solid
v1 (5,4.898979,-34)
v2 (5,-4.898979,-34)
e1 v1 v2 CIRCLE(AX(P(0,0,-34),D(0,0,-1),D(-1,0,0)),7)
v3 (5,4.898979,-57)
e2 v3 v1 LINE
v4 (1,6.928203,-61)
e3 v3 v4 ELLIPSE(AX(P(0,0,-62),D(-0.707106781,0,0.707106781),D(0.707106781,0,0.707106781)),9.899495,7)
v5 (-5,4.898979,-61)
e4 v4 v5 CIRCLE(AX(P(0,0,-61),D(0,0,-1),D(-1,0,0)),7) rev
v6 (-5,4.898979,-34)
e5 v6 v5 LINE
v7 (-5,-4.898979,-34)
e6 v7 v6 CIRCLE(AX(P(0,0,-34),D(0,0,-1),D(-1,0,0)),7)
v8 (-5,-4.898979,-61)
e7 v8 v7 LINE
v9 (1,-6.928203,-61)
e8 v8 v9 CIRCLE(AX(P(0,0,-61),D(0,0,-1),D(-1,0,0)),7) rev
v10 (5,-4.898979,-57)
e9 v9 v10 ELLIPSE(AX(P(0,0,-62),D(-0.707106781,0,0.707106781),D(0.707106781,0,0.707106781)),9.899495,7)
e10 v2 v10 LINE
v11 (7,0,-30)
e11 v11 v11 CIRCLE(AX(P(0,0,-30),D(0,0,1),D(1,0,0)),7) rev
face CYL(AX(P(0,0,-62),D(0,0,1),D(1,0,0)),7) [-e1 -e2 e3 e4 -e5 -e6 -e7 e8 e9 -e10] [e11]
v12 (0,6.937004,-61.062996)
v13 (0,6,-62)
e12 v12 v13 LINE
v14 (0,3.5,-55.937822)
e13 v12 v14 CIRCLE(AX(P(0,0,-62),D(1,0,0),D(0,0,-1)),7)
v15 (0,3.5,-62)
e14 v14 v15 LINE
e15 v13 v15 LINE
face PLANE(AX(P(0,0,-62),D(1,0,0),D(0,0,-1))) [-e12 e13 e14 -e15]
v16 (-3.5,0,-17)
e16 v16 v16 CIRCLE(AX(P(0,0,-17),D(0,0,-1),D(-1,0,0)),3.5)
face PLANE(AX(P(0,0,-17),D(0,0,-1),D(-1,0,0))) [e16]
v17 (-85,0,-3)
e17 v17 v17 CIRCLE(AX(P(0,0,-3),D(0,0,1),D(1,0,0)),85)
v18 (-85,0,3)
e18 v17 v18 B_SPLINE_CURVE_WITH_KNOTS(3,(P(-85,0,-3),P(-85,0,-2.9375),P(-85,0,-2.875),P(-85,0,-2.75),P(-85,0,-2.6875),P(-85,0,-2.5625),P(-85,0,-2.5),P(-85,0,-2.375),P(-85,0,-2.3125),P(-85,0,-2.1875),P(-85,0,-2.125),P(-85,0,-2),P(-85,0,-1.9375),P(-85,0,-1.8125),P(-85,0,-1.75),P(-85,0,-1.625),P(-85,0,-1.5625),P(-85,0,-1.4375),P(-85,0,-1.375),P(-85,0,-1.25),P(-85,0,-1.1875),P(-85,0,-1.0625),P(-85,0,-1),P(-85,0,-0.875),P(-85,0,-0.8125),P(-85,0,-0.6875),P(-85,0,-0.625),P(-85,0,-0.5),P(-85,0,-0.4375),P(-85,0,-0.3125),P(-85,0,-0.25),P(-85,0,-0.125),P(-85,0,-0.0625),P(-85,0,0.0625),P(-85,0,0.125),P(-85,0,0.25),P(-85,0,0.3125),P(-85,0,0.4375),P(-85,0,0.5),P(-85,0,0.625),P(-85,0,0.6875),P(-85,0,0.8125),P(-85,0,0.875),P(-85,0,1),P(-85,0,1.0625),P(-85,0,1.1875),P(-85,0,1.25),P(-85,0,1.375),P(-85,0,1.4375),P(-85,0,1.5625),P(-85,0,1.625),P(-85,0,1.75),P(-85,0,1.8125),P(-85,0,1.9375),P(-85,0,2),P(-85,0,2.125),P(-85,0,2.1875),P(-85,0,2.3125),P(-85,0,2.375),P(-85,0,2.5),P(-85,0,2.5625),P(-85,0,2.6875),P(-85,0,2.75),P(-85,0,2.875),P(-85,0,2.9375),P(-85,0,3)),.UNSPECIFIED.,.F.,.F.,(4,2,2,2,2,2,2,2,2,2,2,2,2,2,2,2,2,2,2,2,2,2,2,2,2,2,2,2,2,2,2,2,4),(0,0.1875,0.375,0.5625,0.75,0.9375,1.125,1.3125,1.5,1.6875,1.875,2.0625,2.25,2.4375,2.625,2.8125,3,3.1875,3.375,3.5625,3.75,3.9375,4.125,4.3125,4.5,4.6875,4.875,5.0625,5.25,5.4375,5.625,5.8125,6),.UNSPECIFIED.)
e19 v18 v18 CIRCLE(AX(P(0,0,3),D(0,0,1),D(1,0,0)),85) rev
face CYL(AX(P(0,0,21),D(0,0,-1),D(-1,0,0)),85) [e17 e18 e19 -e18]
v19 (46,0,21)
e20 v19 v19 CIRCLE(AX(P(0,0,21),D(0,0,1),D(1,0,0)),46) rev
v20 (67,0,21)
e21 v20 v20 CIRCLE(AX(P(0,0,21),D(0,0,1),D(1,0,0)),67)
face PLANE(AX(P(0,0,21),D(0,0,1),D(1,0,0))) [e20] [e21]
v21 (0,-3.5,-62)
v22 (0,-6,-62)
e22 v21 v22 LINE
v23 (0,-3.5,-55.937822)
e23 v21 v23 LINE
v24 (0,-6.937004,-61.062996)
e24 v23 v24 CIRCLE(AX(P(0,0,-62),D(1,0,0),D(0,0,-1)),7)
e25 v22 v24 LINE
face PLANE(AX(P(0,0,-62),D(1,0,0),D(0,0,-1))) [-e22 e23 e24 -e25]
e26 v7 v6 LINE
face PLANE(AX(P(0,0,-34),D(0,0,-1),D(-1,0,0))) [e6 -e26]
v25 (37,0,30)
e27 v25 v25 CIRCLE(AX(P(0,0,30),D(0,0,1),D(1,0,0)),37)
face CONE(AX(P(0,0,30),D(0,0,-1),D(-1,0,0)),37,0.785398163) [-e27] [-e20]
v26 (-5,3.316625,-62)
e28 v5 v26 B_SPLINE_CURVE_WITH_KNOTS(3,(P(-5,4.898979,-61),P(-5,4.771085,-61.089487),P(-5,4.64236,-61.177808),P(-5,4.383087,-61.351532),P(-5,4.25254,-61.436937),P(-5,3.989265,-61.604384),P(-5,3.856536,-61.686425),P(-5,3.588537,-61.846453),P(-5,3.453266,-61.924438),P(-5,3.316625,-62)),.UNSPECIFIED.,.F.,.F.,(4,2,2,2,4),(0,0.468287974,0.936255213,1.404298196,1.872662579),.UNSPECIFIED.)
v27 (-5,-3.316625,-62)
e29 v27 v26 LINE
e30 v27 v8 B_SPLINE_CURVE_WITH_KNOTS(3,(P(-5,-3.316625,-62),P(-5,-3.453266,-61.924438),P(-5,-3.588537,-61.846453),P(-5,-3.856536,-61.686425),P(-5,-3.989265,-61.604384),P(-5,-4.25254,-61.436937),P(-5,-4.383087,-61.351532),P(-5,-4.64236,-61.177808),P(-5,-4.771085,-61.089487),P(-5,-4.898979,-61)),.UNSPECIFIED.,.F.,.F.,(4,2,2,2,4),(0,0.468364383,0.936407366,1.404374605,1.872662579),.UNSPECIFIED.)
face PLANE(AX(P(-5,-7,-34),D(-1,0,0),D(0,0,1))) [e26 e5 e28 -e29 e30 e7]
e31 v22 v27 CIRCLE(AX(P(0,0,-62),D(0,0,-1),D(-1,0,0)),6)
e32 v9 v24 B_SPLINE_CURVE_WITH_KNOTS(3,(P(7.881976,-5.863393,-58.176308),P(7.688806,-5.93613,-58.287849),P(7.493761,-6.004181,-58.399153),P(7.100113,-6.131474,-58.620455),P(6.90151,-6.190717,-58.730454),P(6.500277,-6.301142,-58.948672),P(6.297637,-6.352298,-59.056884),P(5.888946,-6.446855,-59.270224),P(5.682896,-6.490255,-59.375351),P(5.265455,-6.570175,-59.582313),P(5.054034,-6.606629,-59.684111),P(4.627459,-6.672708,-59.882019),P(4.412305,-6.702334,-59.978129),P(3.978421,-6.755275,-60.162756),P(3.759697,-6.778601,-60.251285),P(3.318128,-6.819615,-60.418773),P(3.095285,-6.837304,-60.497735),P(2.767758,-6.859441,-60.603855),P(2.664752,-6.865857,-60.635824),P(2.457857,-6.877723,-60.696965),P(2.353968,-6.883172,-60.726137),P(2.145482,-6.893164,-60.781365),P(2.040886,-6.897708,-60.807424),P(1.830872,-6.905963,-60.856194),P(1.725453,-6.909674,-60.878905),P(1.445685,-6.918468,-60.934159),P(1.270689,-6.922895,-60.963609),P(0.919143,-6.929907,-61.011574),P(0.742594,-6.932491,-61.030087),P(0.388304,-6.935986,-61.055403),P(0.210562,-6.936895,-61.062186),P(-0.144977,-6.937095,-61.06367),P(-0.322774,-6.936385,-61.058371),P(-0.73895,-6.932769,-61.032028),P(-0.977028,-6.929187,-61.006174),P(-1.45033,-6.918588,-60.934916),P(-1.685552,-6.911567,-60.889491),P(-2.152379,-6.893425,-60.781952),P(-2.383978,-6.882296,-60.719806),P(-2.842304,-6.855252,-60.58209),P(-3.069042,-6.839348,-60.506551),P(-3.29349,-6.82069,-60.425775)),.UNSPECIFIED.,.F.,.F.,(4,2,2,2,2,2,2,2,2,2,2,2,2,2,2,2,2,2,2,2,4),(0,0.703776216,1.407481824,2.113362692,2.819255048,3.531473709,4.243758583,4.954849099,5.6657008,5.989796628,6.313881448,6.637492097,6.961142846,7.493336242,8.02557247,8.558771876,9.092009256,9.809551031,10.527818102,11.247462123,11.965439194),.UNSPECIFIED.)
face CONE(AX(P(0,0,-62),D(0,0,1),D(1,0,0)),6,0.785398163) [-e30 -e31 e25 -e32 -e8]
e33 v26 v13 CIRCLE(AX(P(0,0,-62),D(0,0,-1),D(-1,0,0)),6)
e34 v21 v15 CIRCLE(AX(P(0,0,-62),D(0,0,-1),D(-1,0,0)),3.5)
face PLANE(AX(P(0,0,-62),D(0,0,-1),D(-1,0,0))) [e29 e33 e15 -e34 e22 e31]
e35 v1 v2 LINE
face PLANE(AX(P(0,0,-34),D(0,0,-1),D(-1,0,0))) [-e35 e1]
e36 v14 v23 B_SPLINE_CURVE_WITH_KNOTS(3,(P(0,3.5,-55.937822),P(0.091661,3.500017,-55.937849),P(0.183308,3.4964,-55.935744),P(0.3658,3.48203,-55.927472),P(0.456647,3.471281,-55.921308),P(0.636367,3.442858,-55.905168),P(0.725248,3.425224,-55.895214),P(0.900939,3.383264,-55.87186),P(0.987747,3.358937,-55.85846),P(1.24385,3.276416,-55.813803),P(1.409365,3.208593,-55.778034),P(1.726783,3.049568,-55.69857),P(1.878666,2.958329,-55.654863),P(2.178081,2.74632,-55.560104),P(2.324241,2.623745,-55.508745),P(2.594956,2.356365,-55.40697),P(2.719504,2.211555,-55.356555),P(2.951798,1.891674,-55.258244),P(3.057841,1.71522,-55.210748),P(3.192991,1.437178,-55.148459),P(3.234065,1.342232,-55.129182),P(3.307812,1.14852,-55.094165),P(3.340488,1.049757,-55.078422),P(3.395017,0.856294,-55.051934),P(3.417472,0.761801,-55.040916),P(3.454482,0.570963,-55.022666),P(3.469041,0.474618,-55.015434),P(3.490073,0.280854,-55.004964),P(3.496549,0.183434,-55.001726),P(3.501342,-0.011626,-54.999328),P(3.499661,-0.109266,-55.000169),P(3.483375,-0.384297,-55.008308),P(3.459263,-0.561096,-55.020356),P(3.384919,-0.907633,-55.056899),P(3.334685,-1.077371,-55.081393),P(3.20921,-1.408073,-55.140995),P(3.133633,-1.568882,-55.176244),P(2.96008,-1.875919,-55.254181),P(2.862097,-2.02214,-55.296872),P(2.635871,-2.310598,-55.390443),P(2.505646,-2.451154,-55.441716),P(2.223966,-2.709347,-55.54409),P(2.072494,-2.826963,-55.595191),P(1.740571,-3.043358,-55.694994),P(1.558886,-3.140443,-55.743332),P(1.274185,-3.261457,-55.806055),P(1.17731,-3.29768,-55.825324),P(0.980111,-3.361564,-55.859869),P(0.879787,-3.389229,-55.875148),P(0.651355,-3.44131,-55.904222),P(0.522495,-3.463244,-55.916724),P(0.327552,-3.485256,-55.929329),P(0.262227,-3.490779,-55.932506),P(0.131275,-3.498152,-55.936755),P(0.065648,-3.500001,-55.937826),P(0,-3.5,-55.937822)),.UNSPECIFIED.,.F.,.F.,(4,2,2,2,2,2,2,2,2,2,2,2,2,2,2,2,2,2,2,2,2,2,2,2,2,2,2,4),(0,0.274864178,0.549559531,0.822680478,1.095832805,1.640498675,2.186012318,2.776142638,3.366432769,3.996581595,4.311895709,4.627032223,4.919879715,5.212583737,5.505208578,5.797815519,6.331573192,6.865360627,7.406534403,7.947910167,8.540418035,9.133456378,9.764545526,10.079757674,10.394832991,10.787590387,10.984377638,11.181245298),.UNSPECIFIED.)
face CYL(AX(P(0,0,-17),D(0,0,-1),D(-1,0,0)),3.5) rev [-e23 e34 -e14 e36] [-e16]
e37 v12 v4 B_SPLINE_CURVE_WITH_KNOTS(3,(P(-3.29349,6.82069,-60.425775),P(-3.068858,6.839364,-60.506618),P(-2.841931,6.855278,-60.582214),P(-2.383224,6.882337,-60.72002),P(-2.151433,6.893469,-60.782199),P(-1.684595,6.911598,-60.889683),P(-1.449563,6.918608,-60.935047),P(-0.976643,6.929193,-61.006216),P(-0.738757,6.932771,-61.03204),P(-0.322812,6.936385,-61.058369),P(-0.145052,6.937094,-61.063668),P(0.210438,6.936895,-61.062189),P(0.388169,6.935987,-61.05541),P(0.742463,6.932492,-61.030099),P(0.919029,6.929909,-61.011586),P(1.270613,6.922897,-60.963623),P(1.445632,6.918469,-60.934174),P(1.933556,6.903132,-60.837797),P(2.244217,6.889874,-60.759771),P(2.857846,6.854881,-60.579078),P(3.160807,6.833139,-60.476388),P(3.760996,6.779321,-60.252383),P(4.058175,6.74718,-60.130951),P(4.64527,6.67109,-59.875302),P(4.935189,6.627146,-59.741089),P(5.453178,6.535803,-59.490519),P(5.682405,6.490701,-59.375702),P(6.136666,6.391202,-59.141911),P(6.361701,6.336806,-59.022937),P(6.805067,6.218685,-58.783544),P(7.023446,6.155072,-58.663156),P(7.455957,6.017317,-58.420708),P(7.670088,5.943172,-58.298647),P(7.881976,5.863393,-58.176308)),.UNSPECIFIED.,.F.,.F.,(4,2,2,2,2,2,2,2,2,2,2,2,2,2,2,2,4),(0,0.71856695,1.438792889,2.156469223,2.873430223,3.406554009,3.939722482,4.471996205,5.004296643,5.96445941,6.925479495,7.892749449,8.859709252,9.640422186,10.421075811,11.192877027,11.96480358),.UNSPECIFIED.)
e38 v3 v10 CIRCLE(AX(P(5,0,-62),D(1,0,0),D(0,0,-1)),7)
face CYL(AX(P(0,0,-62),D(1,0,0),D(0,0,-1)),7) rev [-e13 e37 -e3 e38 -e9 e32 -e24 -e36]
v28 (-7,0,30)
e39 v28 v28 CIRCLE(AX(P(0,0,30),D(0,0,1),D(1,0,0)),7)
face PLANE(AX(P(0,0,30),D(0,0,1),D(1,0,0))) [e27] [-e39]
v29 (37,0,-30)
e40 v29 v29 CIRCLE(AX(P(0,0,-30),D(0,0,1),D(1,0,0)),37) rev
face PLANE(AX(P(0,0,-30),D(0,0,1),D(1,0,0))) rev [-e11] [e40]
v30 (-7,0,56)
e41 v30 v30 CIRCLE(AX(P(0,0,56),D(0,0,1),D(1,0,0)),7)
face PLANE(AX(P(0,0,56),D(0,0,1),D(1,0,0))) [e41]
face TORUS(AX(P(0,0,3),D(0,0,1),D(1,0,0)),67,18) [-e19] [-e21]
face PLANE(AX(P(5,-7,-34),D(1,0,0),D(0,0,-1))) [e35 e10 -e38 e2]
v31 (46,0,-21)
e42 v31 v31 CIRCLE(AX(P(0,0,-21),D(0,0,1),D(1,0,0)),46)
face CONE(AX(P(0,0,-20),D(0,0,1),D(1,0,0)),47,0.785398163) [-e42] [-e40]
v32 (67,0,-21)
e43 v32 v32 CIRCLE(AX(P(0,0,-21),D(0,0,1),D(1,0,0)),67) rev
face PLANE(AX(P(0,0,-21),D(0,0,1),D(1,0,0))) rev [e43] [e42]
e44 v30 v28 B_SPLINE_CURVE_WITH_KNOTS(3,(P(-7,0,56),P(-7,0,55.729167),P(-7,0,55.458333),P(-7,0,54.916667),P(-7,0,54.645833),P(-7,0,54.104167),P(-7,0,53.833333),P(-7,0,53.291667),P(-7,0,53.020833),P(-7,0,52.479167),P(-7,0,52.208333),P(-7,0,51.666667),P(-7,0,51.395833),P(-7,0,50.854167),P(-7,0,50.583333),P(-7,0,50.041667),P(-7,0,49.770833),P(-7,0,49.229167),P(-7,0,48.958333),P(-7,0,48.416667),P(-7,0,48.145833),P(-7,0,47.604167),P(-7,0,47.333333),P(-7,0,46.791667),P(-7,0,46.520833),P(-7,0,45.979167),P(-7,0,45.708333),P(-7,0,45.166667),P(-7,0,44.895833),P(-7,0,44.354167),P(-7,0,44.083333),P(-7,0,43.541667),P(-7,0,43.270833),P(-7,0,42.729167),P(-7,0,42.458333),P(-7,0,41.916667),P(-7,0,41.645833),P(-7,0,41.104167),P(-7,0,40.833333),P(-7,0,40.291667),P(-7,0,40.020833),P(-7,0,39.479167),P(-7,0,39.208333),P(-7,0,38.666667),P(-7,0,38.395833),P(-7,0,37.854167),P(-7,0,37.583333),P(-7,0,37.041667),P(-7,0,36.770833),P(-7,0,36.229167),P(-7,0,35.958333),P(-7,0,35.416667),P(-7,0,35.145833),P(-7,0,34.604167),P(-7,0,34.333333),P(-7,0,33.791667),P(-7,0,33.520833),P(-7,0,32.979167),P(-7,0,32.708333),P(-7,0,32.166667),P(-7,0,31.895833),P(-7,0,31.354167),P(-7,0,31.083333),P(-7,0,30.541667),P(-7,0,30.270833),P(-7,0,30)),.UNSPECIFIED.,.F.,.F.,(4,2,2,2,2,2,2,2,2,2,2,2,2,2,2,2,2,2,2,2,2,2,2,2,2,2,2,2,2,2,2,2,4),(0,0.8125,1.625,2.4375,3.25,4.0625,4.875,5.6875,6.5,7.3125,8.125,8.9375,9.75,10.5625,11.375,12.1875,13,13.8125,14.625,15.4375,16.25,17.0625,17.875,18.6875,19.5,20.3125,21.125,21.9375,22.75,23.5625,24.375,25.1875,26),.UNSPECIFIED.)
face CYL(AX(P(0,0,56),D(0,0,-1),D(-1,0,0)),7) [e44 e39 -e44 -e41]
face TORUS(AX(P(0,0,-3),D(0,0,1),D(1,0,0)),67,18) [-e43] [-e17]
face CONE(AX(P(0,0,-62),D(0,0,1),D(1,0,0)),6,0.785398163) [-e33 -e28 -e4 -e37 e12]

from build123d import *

# Parameters (mm, degrees)
SKETCH_1_R           = 85
EXTRUDE_1_DEPTH      = 21
SKETCH_2_R           = 47
EXTRUDE_2_DEPTH      = 30
CHAMFER_1_SIZE       = 10
SKETCH_3_R           = 7
EXTRUDE_3_DEPTH      = 32
SKETCH_5_OUTSIDE_W   = 223.484
SKETCH_5_OUTSIDE_H   = 223.484
SKETCH_5_OUTSIDE_W_2 = 10
SKETCH_5_OUTSIDE_H_2 = 14
CUT_EXTRUDE_1_DEPTH  = 28
CHAMFER_3_SIZE       = 1
SKETCH_7_R           = 3.5
CUT_EXTRUDE_2_DEPTH  = 45
SKETCH_8_R           = 7
CUT_EXTRUDE_4_DEPTH  = 5
FILLET_1_R           = 18
EXTRUDE_START        = 26
SKETCH_10_R          = 7
EXTRUDE_4_DEPTH      = 26


with BuildPart() as part:
    # 草图1 → 凸台-拉伸1 (new, symmetric)
    with BuildSketch(Plane.XY):
        with Locations(Location((0, 0, 0), (0, 0, 180))):
            Circle(SKETCH_1_R)
    extrude(amount=EXTRUDE_1_DEPTH, both=True)

    # 草图2 → 凸台-拉伸2 (add, symmetric)
    with BuildSketch(Plane.XY):
        Circle(SKETCH_2_R)
    extrude(amount=EXTRUDE_2_DEPTH, both=True)

    # 倒角1
    # the kernel refuses this chamfer: 10 mm, written as the material it takes off along each edge
    with BuildSketch(Plane(origin=(0, 0, -30), x_dir=(1, 0, 0), z_dir=(0, -1, 0))) as chamfer_1_piece_1_section:
        Polygon((47, CHAMFER_1_SIZE), (47 - CHAMFER_1_SIZE, 0), (47, 0), align=None)
    chamfer_1_piece_1 = revolve(axis=Axis((0, 0, -30), (0, 0, 1)), mode=Mode.PRIVATE)
    chamfer_1_piece_1 = split(chamfer_1_piece_1, bisect_by=Plane(origin=(-41.532222796, 0, -21), z_dir=(0, 0, -1)), keep=Keep.TOP, mode=Mode.PRIVATE)
    add(chamfer_1_piece_1, mode=Mode.SUBTRACT)
    with BuildSketch(Plane(origin=(0, 0, 30), x_dir=(1, 0, 0), z_dir=(0, -1, 0))) as chamfer_1_piece_2_section:
        Polygon((47, -CHAMFER_1_SIZE), (47 - CHAMFER_1_SIZE, 0), (47, 0), align=None)
    chamfer_1_piece_2 = revolve(axis=Axis((0, 0, 30), (0, 0, 1)), mode=Mode.PRIVATE)
    chamfer_1_piece_2 = split(chamfer_1_piece_2, bisect_by=Plane(origin=(-41.532222796, 0, 21), z_dir=(0, 0, 1)), keep=Keep.TOP, mode=Mode.PRIVATE)
    add(chamfer_1_piece_2, mode=Mode.SUBTRACT)

    # 草图3 → 凸台-拉伸3 (add)
    with BuildSketch(Plane(origin=(0, 0, -30), x_dir=(-1, 0, 0), z_dir=(0, 0, -1))):
        with Locations(Location((0, 0, 0), (0, 0, 180))):
            Circle(SKETCH_3_R)
    extrude(amount=EXTRUDE_3_DEPTH)

    # 草图5 outside → 切除-拉伸1 (cut)
    with BuildSketch(Plane(origin=(0, 0, -62), x_dir=(-1, 0, 0), z_dir=(0, 0, -1))):
        Rectangle(SKETCH_5_OUTSIDE_W, SKETCH_5_OUTSIDE_H)
        Rectangle(SKETCH_5_OUTSIDE_W_2, SKETCH_5_OUTSIDE_H_2, mode=Mode.SUBTRACT)
    extrude(amount=-CUT_EXTRUDE_1_DEPTH, mode=Mode.SUBTRACT)

    # 倒角3
    # the kernel refuses this chamfer: 1 mm, written as the material it takes off along each edge
    with BuildSketch(Plane(origin=(0, 0, -62), x_dir=(-0.9180065533872216, 0.39656521271805273, 0), z_dir=(-0.39656521271805273, -0.9180065533872216, 0))) as chamfer_3_piece_1:
        Polygon((7, -CHAMFER_3_SIZE), (7 - CHAMFER_3_SIZE, 0), (7, 0), align=None)
    revolve(axis=Axis((0, 0, -62), (0, 0, -1)), revolution_arc=66.636371816, mode=Mode.SUBTRACT)
    with BuildSketch(Plane(origin=(0, 0, -62), x_dir=(0.9180065533873013, -0.3965652127178682, 0), z_dir=(0.3965652127178682, 0.9180065533873013, 0))) as chamfer_3_piece_2:
        Polygon((7, -CHAMFER_3_SIZE), (7 - CHAMFER_3_SIZE, 0), (7, 0), align=None)
    revolve(axis=Axis((0, 0, -62), (0, 0, -1)), revolution_arc=66.636371927, mode=Mode.SUBTRACT)
    with BuildSketch(Plane(origin=(0, 0, -62), x_dir=(-1.935452947399645e-09, -1.0, 0), z_dir=(1.0, -1.935452947399645e-09, 0))) as chamfer_3_piece_3:
        Polygon((7, -CHAMFER_3_SIZE), (7 - CHAMFER_3_SIZE, 0), (7, 0), align=None)
    revolve(axis=Axis((0, 0, -62), (0, 0, -1)), revolution_arc=66.636371706, mode=Mode.SUBTRACT)
    with BuildSketch(Plane(origin=(0, 0, -62), x_dir=(0, 1, 0), z_dir=(-1, 0, 0))) as chamfer_3_piece_4:
        Polygon((7, -CHAMFER_3_SIZE), (7 - CHAMFER_3_SIZE, 0), (7, 0), align=None)
    revolve(axis=Axis((0, 0, -62), (0, 0, -1)), revolution_arc=66.636371816, mode=Mode.SUBTRACT)

    # 草图7 → 切除-拉伸2 (cut)
    with BuildSketch(Plane(origin=(0, 0, -62), x_dir=(-1, 0, 0), z_dir=(0, 0, -1))):
        Circle(SKETCH_7_R)
    extrude(amount=-CUT_EXTRUDE_2_DEPTH, mode=Mode.SUBTRACT)

    # 草图8 → 切除-拉伸4 (cut)
    with BuildSketch(Plane(origin=(5, 0, 0), x_dir=(0, 0, -1), z_dir=(1, 0, 0))):
        with Locations((62, 0)):
            Circle(SKETCH_8_R)
    extrude(amount=-CUT_EXTRUDE_4_DEPTH, mode=Mode.SUBTRACT)

    # 圆角1
    fillet_1_edges = [part.edges().sort_by_distance(p)[0] for p in [
        (85, 0, -21),
        (85, 0, 21),
    ]]
    fillet(fillet_1_edges, radius=FILLET_1_R)

    # 草图10 → 凸台-拉伸4 (add)
    with BuildSketch(Plane.XY.offset(30).offset(EXTRUDE_START)):
        Circle(SKETCH_10_R)
    extrude(amount=-EXTRUDE_4_DEPTH)


solid = part.part
